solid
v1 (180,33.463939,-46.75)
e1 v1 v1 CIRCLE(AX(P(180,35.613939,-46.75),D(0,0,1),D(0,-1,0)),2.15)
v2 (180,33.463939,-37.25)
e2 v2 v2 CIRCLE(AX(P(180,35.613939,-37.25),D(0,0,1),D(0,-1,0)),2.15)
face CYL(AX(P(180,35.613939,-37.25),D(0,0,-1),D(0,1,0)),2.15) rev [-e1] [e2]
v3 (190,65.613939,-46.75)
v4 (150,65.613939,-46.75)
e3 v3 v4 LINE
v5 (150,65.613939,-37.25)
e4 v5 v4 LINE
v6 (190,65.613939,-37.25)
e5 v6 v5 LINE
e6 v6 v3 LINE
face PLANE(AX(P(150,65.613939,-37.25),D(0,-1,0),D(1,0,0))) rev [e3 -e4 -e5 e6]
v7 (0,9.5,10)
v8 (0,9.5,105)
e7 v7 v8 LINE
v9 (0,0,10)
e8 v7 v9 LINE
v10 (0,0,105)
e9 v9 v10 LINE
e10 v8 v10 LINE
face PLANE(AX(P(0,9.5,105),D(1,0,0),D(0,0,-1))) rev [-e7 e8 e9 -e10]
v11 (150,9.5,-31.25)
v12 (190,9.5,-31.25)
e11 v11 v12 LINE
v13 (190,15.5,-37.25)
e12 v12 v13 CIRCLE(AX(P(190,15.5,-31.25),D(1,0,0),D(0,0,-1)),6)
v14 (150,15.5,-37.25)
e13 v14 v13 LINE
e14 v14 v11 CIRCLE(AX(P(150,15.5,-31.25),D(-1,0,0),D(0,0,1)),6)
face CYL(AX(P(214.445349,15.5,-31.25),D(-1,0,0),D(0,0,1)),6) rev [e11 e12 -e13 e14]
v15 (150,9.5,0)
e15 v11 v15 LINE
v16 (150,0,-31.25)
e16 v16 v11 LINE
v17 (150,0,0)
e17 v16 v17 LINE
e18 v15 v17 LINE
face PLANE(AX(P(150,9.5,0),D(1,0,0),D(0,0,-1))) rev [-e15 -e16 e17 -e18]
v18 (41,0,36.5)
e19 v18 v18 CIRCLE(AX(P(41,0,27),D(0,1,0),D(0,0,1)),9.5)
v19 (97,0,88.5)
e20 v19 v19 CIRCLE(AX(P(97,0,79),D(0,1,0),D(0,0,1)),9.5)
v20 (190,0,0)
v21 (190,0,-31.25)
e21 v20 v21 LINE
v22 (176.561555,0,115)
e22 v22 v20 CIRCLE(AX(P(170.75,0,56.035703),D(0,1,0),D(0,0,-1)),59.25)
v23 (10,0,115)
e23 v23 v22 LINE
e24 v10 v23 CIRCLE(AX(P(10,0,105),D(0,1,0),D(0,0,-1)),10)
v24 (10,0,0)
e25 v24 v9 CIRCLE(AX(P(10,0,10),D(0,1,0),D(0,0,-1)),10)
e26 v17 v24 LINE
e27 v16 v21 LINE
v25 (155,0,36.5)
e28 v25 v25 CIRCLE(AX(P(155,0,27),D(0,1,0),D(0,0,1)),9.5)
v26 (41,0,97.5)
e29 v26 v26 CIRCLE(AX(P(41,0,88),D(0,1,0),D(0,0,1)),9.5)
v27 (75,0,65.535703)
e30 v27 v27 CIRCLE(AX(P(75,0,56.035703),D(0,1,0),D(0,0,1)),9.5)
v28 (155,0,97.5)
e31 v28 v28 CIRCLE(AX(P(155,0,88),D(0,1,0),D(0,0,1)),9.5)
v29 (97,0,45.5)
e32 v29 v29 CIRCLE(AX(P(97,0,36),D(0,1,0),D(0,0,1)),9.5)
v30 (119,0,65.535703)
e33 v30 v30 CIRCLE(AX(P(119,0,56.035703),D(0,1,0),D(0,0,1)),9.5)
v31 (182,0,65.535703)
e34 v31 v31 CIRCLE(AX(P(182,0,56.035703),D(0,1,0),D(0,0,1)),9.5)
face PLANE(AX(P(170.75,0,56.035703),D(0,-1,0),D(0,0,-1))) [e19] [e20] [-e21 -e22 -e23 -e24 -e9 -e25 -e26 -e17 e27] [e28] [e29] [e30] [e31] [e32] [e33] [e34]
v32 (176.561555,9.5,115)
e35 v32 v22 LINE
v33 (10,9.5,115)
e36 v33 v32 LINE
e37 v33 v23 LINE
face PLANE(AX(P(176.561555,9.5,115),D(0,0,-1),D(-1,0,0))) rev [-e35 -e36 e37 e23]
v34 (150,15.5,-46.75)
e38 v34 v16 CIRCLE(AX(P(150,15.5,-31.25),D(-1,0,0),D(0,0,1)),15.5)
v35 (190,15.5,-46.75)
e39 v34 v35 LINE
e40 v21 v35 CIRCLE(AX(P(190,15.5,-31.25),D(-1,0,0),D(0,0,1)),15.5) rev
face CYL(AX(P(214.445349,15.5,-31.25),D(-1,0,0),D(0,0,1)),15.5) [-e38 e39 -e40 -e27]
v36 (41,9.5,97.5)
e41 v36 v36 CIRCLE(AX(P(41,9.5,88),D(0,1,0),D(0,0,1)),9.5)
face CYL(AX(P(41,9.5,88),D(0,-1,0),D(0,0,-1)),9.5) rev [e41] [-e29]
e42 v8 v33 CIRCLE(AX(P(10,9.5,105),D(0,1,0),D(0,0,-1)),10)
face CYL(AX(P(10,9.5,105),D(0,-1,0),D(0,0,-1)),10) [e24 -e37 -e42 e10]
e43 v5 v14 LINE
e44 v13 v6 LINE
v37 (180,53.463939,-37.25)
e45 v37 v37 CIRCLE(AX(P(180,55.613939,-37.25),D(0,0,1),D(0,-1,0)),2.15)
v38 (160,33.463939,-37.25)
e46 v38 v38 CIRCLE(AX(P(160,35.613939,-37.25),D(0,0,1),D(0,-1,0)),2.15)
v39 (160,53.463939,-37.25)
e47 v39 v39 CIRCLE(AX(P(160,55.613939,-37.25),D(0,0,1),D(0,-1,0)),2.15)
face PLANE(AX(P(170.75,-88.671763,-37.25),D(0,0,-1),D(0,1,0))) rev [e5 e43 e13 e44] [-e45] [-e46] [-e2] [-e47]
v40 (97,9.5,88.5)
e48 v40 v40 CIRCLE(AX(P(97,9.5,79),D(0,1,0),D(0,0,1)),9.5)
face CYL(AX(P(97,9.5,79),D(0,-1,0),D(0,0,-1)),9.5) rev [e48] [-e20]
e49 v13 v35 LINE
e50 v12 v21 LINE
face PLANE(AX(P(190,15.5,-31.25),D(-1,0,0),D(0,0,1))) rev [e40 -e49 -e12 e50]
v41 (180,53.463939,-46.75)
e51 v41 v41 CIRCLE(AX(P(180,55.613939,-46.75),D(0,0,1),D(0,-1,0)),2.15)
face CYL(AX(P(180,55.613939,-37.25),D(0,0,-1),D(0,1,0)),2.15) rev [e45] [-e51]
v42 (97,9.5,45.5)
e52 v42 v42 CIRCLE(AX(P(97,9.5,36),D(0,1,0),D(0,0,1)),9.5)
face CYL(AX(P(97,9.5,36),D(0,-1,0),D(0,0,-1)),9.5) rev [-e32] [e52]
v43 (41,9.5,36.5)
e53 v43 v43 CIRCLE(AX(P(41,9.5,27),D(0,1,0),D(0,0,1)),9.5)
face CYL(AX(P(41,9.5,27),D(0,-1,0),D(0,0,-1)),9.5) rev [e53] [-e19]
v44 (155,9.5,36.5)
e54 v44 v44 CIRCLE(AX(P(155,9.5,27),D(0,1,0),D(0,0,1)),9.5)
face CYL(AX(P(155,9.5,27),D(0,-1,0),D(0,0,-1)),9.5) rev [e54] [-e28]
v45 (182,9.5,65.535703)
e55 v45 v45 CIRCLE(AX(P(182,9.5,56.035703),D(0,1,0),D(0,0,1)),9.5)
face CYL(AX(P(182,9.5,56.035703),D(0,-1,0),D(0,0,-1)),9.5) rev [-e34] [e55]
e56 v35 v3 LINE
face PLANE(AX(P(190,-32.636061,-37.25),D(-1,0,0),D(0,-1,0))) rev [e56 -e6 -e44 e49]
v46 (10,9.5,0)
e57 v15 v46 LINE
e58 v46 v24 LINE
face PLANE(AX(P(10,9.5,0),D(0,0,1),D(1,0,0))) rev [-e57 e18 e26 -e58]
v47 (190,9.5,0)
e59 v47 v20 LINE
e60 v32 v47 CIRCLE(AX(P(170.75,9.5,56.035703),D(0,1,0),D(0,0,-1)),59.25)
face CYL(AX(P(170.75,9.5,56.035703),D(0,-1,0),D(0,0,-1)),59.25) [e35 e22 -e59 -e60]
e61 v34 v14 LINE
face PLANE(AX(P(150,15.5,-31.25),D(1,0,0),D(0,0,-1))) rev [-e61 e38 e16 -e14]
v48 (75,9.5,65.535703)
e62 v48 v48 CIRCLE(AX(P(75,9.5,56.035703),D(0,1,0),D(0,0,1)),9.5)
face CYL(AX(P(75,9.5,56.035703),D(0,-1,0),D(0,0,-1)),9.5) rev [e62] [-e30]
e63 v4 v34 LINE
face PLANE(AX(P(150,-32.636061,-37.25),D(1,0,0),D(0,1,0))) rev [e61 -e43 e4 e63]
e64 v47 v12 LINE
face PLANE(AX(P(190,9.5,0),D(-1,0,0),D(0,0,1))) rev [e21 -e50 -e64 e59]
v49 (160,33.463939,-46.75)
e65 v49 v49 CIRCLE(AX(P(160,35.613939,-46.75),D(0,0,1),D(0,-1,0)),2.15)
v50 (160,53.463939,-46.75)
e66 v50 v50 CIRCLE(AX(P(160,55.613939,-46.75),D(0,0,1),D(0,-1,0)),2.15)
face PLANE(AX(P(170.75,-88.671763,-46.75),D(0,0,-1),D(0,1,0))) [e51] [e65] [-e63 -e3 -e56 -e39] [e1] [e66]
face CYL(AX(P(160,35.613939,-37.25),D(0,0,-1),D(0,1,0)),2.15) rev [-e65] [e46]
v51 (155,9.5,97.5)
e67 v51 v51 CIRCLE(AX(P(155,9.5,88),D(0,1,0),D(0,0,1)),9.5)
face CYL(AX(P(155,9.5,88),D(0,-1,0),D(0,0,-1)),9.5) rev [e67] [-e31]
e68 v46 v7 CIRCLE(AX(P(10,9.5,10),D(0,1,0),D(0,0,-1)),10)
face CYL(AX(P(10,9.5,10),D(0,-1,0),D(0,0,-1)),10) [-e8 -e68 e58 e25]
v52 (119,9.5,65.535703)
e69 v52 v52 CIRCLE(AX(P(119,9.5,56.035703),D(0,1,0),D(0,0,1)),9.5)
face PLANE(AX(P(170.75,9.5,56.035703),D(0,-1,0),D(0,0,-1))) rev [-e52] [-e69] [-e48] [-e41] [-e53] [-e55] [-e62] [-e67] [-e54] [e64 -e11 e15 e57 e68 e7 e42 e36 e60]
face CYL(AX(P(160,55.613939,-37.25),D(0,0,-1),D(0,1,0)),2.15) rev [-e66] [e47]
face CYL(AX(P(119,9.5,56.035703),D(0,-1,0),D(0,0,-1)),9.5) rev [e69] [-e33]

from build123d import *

# Parameters (mm, degrees)
SKETCH1_R                  = 9.5
SKETCH1_R_2                = 2.15
BASE_FLANGE1_DEPTH         = 9.5
SKETCHED_START             = -98.25
SKETCHED_BEND1_OUTLINE_W   = 40
SKETCHED_BEND1_OUTLINE_H   = 9.5
SKETCHED_BEND1_DEPTH       = 51.5
SKETCHED_START_2           = -45.24247
SKETCHED_BEND1_2_OUTLINE_W = 40
SKETCHED_BEND1_2_OUTLINE_H = 56.113939487
SKETCHED_BEND1_2_OUTLINE_R = 2.15
SKETCHED_BEND1_2_DEPTH     = 7.99247
SKETCHED_START_3           = -46.75
SKETCHED_BEND1_3_OUTLINE_W = 40
SKETCHED_BEND1_3_OUTLINE_H = 56.113939487
SKETCHED_BEND1_3_OUTLINE_R = 2.15
SKETCHED_BEND1_3_DEPTH     = 15.5
SKETCHED_START_4           = 150
SKETCHED_BEND1_4_DEPTH     = 40


with BuildPart() as part:
    # Base-Flange1: sheet metal written as solids
    # Sketch1 → Base-Flange1 (new body)
    with BuildSketch(Plane(origin=(0, 0, 0), x_dir=(1, 0, 0), z_dir=(0, 1, 0))):
        with BuildLine():
            Line((0, -105), (0, -10))
            ThreePointArc((0, -10), (2.928932188, -2.928932188), (10, 0))
            Line((10, 0), (150, 0))
            Line((150, 0), (150, 98.25))
            Line((150, 98.25), (190, 98.25))
            Line((190, 98.25), (190, 0))
            ThreePointArc((190, 0), (229.599557186, -62.912629471), (176.5615547, -115))
            Line((176.5615547, -115), (10, -115))
            ThreePointArc((10, -115), (2.928932188, -112.071067812), (0, -105))
        make_face()
        with Locations(Location((41, -27, 0), (0, 0, 270))):
            Circle(SKETCH1_R, mode=Mode.SUBTRACT)
        with Locations(Location((41, -88, 0), (0, 0, 270))):
            Circle(SKETCH1_R, mode=Mode.SUBTRACT)
        with Locations(Location((160, 88.25, 0), (0, 0, 270))):
            Circle(SKETCH1_R_2, mode=Mode.SUBTRACT)
        with Locations(Location((180, 88.25, 0), (0, 0, 270))):
            Circle(SKETCH1_R_2, mode=Mode.SUBTRACT)
        with Locations(Location((180, 68.25, 0), (0, 0, 270))):
            Circle(SKETCH1_R_2, mode=Mode.SUBTRACT)
        with Locations(Location((160, 68.25, 0), (0, 0, 270))):
            Circle(SKETCH1_R_2, mode=Mode.SUBTRACT)
        with Locations(Location((75, -56.035702904, 0), (0, 0, 270))):
            Circle(SKETCH1_R, mode=Mode.SUBTRACT)
        with Locations(Location((119, -56.035702904, 0), (0, 0, 270))):
            Circle(SKETCH1_R, mode=Mode.SUBTRACT)
        with Locations(Location((97, -36, 0), (0, 0, 270))):
            Circle(SKETCH1_R, mode=Mode.SUBTRACT)
        with Locations(Location((97, -79, 0), (0, 0, 270))):
            Circle(SKETCH1_R, mode=Mode.SUBTRACT)
        with Locations(Location((155, -27, 0), (0, 0, 270))):
            Circle(SKETCH1_R, mode=Mode.SUBTRACT)
        with Locations(Location((182, -56.035702904, 0), (0, 0, 270))):
            Circle(SKETCH1_R, mode=Mode.SUBTRACT)
        with Locations(Location((155, -88, 0), (0, 0, 270))):
            Circle(SKETCH1_R, mode=Mode.SUBTRACT)
    extrude(amount=BASE_FLANGE1_DEPTH)

    # Sketched Bend1: read off the stored shape, not the designer's step
    # Sketched Bend1 outline → Sketched Bend1 (cut)
    with BuildSketch(Plane.XY.offset(SKETCHED_START)):
        with Locations((170, 4.75)):
            Rectangle(SKETCHED_BEND1_OUTLINE_W, SKETCHED_BEND1_OUTLINE_H)
    extrude(amount=SKETCHED_BEND1_DEPTH, mode=Mode.SUBTRACT)

    # Sketched Bend1 2 outline → Sketched Bend1 2 (add)
    with BuildSketch(Plane.XY.offset(SKETCHED_START_2)):
        with Locations((170, 37.556969744)):
            Rectangle(SKETCHED_BEND1_2_OUTLINE_W, SKETCHED_BEND1_2_OUTLINE_H)
        with Locations((160, 35.613939487)):
            Circle(SKETCHED_BEND1_2_OUTLINE_R, mode=Mode.SUBTRACT)
        with Locations((160, 55.613939487)):
            Circle(SKETCHED_BEND1_2_OUTLINE_R, mode=Mode.SUBTRACT)
        with Locations((180, 35.613939487)):
            Circle(SKETCHED_BEND1_2_OUTLINE_R, mode=Mode.SUBTRACT)
        with Locations((180, 55.613939487)):
            Circle(SKETCHED_BEND1_2_OUTLINE_R, mode=Mode.SUBTRACT)
    extrude(amount=SKETCHED_BEND1_2_DEPTH)

    # Sketched Bend1 3 outline → Sketched Bend1 3 (add)
    with BuildSketch(Plane.XY.offset(SKETCHED_START_3)):
        with Locations((170, 37.556969744)):
            Rectangle(SKETCHED_BEND1_3_OUTLINE_W, SKETCHED_BEND1_3_OUTLINE_H)
        with Locations((160, 35.613939487)):
            Circle(SKETCHED_BEND1_3_OUTLINE_R, mode=Mode.SUBTRACT)
        with Locations((180, 35.613939487)):
            Circle(SKETCHED_BEND1_3_OUTLINE_R, mode=Mode.SUBTRACT)
        with Locations((160, 55.613939487)):
            Circle(SKETCHED_BEND1_3_OUTLINE_R, mode=Mode.SUBTRACT)
        with Locations((180, 55.613939487)):
            Circle(SKETCHED_BEND1_3_OUTLINE_R, mode=Mode.SUBTRACT)
    extrude(amount=SKETCHED_BEND1_3_DEPTH)

    # Sketched Bend1 4 outline → Sketched Bend1 4 (cut)
    with BuildSketch(Plane.YZ.offset(SKETCHED_START_4)):
        with BuildLine():
            ThreePointArc((9.5, -31.25), (11.257359313, -35.492640687), (15.5, -37.25))
            Line((15.5, -37.25), (65.613939487, -37.25))
            Line((65.613939487, -37.25), (65.613939487, -31.25))
            Line((65.613939487, -31.25), (9.5, -31.25))
        make_face()
        with BuildLine():
            Line((0, -46.75), (15.5, -46.75))
            ThreePointArc((15.5, -46.75), (4.539844892, -42.210155108), (0, -31.25))
            Line((0, -31.25), (0, -46.75))
        make_face()
    extrude(amount=SKETCHED_BEND1_4_DEPTH, mode=Mode.SUBTRACT)


solid = part.part
